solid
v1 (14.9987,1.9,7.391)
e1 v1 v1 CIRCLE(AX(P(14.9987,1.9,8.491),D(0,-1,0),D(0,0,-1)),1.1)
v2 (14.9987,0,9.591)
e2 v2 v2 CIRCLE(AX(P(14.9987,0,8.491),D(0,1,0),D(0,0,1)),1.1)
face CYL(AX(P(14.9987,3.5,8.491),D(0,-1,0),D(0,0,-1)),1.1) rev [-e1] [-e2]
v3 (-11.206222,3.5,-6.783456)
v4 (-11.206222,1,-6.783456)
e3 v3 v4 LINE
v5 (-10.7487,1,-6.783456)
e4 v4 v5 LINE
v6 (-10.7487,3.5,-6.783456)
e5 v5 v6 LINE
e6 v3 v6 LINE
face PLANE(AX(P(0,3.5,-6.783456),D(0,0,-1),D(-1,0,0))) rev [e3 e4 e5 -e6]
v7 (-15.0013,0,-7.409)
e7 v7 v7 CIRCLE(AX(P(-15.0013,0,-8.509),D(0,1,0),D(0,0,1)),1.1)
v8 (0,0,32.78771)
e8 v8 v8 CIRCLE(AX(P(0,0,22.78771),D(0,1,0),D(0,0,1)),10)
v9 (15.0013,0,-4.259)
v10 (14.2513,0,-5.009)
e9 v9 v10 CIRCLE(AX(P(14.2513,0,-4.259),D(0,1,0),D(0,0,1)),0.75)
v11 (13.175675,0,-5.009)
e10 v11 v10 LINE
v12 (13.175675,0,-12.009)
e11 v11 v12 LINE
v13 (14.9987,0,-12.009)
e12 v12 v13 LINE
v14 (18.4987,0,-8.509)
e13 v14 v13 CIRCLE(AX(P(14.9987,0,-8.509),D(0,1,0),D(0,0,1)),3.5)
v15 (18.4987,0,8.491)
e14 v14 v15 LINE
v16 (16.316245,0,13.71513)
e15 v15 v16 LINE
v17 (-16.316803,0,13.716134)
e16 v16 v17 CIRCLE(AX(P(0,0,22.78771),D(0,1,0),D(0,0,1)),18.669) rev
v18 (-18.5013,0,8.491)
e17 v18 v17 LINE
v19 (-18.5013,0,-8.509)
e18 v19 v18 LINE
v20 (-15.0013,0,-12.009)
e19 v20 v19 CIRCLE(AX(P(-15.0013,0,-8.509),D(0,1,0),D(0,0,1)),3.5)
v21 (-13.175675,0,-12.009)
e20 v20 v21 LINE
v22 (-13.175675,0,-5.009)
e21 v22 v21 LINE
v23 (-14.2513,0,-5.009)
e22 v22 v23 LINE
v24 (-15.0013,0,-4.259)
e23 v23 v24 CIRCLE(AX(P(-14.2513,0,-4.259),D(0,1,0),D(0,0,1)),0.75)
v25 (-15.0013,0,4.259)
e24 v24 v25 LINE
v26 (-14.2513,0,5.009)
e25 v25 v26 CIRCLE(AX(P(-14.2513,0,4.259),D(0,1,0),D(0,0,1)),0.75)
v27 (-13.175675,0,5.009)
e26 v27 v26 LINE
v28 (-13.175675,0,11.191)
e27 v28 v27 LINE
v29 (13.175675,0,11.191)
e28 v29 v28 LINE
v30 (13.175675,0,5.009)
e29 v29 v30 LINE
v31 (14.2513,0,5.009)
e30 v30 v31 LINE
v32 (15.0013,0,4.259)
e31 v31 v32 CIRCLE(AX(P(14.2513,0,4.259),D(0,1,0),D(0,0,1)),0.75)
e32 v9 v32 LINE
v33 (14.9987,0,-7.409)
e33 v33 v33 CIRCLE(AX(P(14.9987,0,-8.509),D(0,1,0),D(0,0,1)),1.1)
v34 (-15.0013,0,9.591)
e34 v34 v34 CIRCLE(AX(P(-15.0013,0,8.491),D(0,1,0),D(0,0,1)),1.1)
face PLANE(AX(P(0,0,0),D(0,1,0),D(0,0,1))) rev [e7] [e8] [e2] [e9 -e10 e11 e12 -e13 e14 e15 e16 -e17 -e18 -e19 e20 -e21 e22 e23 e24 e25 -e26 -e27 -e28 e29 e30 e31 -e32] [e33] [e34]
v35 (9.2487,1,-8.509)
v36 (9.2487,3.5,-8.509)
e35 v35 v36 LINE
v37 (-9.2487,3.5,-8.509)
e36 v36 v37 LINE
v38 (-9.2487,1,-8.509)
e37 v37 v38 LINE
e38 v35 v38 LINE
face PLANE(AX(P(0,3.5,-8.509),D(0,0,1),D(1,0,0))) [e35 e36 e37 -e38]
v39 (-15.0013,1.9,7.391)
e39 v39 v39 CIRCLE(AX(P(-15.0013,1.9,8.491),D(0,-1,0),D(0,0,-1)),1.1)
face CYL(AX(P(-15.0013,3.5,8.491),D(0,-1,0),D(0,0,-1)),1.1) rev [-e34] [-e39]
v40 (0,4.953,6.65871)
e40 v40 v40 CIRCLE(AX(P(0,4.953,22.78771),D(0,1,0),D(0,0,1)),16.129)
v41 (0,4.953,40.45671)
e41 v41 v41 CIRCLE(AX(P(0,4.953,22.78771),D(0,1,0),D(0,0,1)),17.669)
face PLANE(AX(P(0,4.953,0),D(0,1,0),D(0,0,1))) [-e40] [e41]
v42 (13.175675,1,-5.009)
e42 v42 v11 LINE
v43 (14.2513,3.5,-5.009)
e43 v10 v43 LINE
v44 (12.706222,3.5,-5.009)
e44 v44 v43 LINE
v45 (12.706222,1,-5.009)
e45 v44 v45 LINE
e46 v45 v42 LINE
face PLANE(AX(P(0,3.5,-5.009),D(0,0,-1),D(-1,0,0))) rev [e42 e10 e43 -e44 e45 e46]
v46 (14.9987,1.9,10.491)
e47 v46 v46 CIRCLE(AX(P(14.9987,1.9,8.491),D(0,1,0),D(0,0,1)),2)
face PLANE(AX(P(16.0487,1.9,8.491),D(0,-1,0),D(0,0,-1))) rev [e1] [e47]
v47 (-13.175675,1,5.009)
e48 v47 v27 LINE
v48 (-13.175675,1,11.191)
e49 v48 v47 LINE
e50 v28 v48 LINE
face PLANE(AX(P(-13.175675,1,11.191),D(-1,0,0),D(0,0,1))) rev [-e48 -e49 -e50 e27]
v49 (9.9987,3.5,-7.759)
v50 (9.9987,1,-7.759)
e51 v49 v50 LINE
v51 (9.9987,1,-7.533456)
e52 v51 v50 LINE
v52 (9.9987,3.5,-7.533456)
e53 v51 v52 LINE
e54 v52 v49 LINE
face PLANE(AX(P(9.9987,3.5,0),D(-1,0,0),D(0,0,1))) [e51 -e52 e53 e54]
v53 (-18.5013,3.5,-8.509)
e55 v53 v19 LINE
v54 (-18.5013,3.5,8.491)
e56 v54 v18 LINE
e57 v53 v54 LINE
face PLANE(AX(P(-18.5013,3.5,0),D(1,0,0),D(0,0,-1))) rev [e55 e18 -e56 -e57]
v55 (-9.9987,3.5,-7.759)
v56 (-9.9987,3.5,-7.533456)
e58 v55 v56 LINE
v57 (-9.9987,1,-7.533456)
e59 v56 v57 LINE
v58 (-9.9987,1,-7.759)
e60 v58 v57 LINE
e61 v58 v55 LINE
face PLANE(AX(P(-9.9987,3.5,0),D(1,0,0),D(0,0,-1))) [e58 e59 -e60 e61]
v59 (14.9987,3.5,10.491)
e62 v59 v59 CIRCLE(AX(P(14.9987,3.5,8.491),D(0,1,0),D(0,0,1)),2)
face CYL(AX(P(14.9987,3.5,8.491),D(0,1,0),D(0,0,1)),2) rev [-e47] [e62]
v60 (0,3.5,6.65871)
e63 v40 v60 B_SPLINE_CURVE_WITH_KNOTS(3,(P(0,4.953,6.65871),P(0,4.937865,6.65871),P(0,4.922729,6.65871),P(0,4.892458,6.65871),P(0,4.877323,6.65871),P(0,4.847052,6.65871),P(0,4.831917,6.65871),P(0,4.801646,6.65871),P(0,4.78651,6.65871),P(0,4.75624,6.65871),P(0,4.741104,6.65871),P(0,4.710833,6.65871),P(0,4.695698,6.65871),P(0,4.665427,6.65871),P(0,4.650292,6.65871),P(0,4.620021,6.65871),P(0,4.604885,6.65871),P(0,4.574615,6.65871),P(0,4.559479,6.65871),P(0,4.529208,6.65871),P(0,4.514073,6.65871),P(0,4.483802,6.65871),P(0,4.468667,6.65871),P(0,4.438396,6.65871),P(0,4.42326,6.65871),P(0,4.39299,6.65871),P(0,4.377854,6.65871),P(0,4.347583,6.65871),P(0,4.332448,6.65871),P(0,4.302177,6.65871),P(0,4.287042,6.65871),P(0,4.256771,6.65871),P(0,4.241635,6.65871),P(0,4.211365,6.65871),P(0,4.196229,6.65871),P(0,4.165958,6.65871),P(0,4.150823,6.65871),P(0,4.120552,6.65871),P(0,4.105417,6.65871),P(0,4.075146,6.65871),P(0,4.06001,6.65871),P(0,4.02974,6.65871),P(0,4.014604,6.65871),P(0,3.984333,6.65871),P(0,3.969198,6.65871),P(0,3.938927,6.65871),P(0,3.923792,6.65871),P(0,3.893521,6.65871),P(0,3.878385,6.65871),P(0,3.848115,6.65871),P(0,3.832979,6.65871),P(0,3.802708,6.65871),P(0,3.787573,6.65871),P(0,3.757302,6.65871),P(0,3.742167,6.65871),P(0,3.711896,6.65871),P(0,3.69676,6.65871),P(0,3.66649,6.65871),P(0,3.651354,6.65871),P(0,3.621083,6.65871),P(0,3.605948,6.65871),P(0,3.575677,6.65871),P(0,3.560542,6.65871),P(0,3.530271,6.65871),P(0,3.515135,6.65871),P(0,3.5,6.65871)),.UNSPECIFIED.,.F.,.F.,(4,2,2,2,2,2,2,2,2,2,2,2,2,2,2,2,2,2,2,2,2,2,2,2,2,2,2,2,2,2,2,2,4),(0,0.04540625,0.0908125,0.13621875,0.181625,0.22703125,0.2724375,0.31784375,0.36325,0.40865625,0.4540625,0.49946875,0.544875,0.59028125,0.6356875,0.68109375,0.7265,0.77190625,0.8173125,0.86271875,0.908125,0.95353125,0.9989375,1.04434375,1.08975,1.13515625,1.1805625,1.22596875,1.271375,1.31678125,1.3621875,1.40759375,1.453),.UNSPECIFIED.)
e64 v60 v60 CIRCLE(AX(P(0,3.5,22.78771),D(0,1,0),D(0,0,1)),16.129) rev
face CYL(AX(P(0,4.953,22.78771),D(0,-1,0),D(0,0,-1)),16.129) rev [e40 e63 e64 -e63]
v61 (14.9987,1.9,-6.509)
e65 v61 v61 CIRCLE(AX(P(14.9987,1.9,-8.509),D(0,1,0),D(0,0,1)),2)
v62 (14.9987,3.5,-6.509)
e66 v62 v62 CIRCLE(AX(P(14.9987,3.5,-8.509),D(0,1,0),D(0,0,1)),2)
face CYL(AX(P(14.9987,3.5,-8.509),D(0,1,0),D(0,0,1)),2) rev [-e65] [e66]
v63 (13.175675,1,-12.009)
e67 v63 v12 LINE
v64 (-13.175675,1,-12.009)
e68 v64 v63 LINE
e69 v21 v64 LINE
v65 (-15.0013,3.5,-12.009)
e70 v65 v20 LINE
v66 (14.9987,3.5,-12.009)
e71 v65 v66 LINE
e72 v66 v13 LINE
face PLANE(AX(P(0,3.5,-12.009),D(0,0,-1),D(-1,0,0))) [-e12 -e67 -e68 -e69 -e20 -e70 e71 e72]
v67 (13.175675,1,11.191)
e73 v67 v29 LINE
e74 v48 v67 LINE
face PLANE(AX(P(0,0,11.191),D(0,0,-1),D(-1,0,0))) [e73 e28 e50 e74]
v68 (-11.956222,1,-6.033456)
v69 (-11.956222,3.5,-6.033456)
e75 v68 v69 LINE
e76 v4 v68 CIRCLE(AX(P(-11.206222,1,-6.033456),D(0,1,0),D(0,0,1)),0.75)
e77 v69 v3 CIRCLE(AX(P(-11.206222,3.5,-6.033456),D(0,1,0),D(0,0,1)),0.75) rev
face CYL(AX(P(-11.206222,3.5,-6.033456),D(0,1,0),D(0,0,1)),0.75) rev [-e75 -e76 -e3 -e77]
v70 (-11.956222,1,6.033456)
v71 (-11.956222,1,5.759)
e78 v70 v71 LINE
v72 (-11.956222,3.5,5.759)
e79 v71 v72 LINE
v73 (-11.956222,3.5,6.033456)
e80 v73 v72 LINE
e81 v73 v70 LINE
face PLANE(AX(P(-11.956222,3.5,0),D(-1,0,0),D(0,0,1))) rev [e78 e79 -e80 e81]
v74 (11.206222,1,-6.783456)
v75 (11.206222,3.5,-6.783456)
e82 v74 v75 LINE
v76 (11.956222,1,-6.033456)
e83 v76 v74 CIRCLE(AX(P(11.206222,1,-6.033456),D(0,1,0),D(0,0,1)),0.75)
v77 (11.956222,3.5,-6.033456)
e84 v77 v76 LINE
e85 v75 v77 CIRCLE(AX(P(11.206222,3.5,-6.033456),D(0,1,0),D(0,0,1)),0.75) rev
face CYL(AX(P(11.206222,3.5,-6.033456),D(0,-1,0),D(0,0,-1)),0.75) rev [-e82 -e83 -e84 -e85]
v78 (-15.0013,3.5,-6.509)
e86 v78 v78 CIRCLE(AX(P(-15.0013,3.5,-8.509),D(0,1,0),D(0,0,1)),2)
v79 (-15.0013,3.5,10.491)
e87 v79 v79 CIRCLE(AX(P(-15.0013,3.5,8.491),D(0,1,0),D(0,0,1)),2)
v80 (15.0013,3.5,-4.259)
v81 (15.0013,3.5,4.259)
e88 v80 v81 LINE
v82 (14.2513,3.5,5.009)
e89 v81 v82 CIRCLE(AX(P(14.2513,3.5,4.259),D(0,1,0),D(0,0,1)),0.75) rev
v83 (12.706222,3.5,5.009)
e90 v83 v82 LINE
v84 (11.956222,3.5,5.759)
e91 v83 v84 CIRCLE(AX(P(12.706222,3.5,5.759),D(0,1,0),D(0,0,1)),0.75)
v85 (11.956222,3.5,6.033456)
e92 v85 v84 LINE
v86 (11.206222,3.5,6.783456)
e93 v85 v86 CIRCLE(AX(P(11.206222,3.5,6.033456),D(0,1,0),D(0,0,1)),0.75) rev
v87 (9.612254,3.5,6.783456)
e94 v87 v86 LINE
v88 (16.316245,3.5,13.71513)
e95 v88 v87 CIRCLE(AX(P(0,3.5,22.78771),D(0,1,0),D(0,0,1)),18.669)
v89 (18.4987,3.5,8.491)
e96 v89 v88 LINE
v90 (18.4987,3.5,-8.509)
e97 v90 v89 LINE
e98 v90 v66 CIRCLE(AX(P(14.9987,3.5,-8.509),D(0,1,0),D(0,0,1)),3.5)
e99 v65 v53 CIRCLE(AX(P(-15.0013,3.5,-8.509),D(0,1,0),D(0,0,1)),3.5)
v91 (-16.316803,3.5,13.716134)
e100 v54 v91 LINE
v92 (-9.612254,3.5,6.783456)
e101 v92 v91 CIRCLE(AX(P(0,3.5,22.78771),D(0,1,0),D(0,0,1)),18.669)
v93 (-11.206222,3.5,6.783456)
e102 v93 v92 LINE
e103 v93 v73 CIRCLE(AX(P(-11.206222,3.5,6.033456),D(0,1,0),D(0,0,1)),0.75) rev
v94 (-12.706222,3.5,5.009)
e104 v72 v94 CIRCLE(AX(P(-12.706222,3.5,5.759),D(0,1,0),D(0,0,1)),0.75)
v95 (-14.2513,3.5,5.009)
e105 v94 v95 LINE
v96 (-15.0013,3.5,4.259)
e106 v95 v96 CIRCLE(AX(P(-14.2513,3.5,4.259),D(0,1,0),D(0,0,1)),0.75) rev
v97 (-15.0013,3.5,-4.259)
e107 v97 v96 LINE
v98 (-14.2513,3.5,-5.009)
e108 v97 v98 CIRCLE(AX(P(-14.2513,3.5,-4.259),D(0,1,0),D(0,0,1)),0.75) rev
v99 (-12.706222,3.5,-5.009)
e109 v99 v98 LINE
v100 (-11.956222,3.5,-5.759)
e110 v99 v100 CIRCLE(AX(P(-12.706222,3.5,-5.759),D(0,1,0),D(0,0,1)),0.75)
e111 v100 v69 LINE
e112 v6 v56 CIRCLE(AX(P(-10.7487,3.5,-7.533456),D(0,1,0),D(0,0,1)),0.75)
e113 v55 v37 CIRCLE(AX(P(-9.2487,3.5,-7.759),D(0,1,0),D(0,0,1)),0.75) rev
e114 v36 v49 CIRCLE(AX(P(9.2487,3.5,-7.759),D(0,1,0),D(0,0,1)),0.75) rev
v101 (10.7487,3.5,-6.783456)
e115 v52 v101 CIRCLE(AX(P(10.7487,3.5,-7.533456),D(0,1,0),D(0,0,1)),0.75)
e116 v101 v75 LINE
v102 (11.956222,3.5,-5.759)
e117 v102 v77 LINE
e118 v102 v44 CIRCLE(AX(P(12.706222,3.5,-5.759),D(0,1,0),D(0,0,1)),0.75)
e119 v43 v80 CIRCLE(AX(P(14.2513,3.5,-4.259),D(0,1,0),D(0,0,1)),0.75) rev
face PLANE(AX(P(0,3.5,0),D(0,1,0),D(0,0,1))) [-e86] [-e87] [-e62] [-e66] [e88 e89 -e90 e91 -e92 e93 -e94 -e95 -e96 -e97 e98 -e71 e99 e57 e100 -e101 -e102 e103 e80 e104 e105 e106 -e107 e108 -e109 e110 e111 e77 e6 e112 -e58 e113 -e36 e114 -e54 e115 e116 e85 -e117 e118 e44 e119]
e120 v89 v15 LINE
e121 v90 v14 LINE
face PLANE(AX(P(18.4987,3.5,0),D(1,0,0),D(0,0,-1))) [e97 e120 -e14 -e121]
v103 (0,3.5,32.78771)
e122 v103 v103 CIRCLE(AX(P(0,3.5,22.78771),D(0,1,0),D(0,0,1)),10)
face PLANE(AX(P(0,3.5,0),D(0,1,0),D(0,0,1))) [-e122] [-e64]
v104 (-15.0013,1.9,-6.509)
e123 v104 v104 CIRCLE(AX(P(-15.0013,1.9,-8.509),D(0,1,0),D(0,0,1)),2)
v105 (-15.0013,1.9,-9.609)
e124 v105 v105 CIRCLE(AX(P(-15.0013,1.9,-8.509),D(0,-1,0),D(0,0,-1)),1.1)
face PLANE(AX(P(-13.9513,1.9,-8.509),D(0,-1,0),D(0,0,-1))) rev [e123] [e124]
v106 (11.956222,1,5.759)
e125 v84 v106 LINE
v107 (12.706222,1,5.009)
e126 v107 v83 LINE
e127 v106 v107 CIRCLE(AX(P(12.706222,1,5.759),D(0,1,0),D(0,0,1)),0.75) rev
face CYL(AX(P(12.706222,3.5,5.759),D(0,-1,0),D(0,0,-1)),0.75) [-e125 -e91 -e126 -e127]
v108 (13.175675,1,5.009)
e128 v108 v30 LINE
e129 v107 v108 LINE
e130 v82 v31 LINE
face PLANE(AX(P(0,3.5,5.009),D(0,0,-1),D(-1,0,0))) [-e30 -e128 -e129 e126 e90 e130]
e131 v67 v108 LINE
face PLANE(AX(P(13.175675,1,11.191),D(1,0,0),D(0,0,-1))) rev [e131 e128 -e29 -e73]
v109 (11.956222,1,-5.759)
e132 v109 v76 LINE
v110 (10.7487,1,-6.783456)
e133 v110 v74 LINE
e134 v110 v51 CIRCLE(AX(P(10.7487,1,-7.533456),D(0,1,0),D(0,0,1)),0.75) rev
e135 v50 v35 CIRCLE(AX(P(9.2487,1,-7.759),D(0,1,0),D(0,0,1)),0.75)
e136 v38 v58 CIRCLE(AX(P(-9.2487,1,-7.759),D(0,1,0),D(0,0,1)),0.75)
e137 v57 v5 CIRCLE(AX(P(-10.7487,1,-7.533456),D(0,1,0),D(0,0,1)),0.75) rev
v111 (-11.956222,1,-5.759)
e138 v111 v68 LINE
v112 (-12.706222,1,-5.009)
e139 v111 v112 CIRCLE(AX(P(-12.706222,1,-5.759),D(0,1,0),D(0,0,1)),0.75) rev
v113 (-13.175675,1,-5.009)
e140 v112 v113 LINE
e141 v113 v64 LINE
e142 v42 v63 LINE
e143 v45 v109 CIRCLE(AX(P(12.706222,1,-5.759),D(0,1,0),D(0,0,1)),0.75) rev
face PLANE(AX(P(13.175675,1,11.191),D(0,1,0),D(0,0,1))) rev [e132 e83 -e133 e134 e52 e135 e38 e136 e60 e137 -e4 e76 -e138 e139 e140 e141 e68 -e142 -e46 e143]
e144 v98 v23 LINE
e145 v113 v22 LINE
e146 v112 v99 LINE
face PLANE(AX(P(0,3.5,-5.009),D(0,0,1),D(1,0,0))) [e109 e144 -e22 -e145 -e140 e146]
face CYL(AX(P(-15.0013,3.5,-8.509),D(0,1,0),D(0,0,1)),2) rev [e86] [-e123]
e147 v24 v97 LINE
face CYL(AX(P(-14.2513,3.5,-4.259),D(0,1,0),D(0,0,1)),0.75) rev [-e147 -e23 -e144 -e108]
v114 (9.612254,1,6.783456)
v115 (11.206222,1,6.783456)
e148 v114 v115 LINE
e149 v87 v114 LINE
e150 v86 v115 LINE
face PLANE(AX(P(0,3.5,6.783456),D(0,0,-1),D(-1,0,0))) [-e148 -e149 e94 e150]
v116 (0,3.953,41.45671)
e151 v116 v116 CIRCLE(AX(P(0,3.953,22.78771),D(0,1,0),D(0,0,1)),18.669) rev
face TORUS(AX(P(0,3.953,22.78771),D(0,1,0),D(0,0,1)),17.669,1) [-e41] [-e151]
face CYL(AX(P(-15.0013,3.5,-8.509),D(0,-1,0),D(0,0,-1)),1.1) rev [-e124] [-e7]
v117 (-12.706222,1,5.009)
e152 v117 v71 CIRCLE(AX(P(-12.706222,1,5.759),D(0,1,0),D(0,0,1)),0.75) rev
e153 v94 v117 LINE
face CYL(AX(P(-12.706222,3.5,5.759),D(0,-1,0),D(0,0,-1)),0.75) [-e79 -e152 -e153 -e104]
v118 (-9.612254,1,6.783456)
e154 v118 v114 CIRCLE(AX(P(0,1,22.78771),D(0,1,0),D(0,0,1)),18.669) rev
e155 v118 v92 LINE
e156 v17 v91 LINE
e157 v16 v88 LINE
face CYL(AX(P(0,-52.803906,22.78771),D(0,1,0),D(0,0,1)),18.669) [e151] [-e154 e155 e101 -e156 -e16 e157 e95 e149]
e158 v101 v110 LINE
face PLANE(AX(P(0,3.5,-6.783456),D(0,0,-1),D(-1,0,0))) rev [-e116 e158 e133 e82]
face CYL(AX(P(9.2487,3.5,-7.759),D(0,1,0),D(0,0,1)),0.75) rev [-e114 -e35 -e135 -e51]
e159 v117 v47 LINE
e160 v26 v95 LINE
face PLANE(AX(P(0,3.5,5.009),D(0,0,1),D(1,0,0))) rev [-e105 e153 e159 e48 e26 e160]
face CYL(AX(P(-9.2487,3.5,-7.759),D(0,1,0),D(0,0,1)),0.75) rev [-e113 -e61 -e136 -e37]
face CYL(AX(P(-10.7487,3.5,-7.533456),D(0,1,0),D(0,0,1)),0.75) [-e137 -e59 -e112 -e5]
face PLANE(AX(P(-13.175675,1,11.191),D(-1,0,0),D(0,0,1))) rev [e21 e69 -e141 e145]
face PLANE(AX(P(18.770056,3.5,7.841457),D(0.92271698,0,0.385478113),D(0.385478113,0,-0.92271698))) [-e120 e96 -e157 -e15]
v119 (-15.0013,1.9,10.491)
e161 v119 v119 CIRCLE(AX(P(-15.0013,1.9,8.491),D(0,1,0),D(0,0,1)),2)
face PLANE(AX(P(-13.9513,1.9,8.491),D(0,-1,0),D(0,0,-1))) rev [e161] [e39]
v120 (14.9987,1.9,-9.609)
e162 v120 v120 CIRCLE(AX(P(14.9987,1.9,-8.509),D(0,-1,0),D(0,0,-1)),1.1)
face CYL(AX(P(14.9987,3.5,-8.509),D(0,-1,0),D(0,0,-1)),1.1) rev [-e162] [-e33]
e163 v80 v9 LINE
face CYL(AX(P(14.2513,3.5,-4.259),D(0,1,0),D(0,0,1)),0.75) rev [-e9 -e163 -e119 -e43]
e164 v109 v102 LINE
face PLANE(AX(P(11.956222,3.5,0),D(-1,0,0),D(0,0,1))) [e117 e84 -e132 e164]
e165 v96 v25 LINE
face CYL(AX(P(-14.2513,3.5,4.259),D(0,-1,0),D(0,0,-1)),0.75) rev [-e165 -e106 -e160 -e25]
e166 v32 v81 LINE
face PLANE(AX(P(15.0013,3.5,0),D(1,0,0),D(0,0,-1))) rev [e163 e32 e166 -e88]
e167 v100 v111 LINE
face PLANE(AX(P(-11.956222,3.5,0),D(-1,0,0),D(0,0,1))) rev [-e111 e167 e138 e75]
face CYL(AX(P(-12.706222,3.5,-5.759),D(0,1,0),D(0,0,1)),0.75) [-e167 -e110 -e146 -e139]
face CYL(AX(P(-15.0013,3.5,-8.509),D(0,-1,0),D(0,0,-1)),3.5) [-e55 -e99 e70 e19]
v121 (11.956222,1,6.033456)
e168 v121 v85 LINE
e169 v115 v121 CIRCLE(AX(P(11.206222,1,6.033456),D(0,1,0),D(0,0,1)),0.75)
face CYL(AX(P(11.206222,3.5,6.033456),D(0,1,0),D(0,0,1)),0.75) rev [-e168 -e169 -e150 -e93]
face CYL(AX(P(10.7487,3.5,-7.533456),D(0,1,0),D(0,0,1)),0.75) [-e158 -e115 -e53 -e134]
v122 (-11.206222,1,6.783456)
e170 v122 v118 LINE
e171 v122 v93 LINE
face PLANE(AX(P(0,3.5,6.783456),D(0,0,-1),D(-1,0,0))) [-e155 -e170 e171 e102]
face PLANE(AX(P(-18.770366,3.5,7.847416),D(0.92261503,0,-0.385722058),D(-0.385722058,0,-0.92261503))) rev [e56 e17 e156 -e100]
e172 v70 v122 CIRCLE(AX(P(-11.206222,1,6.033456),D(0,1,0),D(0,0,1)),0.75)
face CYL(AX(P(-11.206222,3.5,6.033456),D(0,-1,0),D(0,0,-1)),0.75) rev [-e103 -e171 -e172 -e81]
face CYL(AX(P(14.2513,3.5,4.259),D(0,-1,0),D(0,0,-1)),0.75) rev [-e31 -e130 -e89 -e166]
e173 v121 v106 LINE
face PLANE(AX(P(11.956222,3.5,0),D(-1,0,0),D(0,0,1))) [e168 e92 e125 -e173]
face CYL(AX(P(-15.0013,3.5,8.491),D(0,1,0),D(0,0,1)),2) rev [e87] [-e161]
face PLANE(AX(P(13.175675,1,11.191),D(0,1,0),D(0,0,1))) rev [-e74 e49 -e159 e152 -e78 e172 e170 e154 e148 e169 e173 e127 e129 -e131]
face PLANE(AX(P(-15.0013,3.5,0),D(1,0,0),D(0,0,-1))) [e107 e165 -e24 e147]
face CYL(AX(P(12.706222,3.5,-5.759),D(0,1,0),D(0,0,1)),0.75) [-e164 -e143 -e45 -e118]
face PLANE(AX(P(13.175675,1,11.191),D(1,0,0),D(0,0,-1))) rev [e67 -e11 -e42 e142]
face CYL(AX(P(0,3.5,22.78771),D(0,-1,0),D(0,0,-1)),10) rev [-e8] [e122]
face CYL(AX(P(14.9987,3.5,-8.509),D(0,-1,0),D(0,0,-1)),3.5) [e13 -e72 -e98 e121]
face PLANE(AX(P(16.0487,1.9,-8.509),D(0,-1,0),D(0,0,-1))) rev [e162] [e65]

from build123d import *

# Parameters (mm, degrees)
SKETCH1_R                                        = 10
SKETCH1_R_2                                      = 1.1
BOSS_EXTRUDE1_DEPTH                              = 3.5
BOSS_EXTRUDE2_START                              = -3.5
BOSS_EXTRUDE2_DEPTH                              = 3.5
SKETCH8_R                                        = 16.129
BOSS_EXTRUDE4_DEPTH                              = 1.453
SKETCH9_W                                        = 26.35135
SKETCH9_H                                        = 1
CUT_EXTRUDE1_DEPTH                               = 23.2
CBORE_FOR_M2_HEX_HEAD_MACHINE_SCREW1_D           = 2.1
CBORE_FOR_M2_HEX_HEAD_MACHINE_SCREW1_DEPTH       = 3.5
CBORE_FOR_M2_HEX_HEAD_MACHINE_SCREW1_CBORE_D     = 4
CBORE_FOR_M2_HEX_HEAD_MACHINE_SCREW1_CBORE_DEPTH = 1.6
FILLET1_R                                        = 0.75
FILLET2_R                                        = 1


# Read off the part's stored shape, not the designer's step: Boss-Extrude2
with BuildPart() as part:
    # Sketch1 → Boss-Extrude1 (new body)
    with BuildSketch(Plane(origin=(0, 0, 0), x_dir=(1, 0, 0), z_dir=(0, 1, 0))):
        with BuildLine():
            Line((-18.5013, 8.509), (-18.5013, -8.491))
            Line((-18.5013, -8.491), (-15.0013, -16.862708425))
            ThreePointArc((-15.0013, -16.862708425), (0, -38.916709632), (15.0013, -16.862708425))
            Line((15.0013, -16.862708425), (18.4987, -8.491))
            Line((18.4987, -8.491), (18.4987, 8.509))
            ThreePointArc((18.4987, 8.509), (17.473573734, 10.983873734), (14.9987, 12.009))
            Line((14.9987, 12.009), (-15.0013, 12.009))
            ThreePointArc((-15.0013, 12.009), (-17.476173734, 10.983873734), (-18.5013, 8.509))
        make_face()
        with Locations(Location((0, -22.787709632, 0), (0, 0, 270))):
            Circle(SKETCH1_R, mode=Mode.SUBTRACT)
        with Locations(Location((-15.0013, 8.509, 0), (0, 0, 270))):
            Circle(SKETCH1_R_2, mode=Mode.SUBTRACT)
        with Locations(Location((-15.0013, -8.491, 0), (0, 0, 270))):
            Circle(SKETCH1_R_2, mode=Mode.SUBTRACT)
        with Locations(Location((14.9987, 8.509, 0), (0, 0, 270))):
            Circle(SKETCH1_R_2, mode=Mode.SUBTRACT)
        with Locations(Location((14.9987, -8.491, 0), (0, 0, 270))):
            Circle(SKETCH1_R_2, mode=Mode.SUBTRACT)
        Polygon((-11.95622235, -6.783455998), (11.95622235, -6.783455998), (11.95622235, -5.009), (15.0013, -5.009), (15.0013, 5.009), (11.95622235, 5.009), (11.95622235, 6.783455998), (9.9987, 6.783455998), (9.9987, 8.509), (-9.9987, 8.509), (-9.9987, 6.783455998), (-11.95622235, 6.783455998), (-11.95622235, 5.009), (-15.0013, 5.009), (-15.0013, -5.009), (-11.95622235, -5.009), align=None, mode=Mode.SUBTRACT)
    extrude(amount=BOSS_EXTRUDE1_DEPTH)

    # Boss-Extrude2 outline → Boss-Extrude2 (add)
    with BuildSketch(Plane(origin=(0, 3.5, 0), x_dir=(1, 0, 0), z_dir=(0, 1, 0)).offset(BOSS_EXTRUDE2_START)):
        with BuildLine():
            Line((-15.0013, -16.862708425), (-16.316803416, -13.716133844))
            ThreePointArc((-16.316803416, -13.716133844), (0.000574122, -41.456709624), (16.316245434, -13.71513029))
            Line((16.316245434, -13.71513029), (15.0013, -16.862708425))
            ThreePointArc((15.0013, -16.862708425), (0, -38.916709632), (-15.0013, -16.862708425))
        make_face()
        with BuildLine():
            Line((-9.612253982, -6.783455998), (9.612253982, -6.783455998))
            ThreePointArc((9.612253982, -6.783455998), (0, -4.118709632), (-9.612253982, -6.783455998))
        make_face()
    extrude(amount=BOSS_EXTRUDE2_DEPTH)

    # Sketch8 → Boss-Extrude4 (add)
    with BuildSketch(Plane(origin=(0, 3.5, 0), x_dir=(1, 0, 0), z_dir=(0, 1, 0))):
        with BuildLine():
            ThreePointArc((-16.316803416, -13.716133844), (-4.685784781, -40.859095356), (18.669, -22.787709632))
            ThreePointArc((18.669, -22.787709632), (18.071241615, -18.10136911), (16.316245434, -13.71513029))
            ThreePointArc((16.316245434, -13.71513029), (13.419530454, -9.808966882), (9.612253982, -6.783455998))
            ThreePointArc((9.612253982, -6.783455998), (0, -4.118709632), (-9.612253982, -6.783455998))
            ThreePointArc((-9.612253982, -6.783455998), (-13.419929579, -9.809379575), (-16.316803416, -13.716133844))
        make_face()
        with Locations(Location((0, -22.787709632, 0), (0, 0, 90))):
            Circle(SKETCH8_R, mode=Mode.SUBTRACT)
    extrude(amount=BOSS_EXTRUDE4_DEPTH)

    # Sketch9 → Cut-Extrude1 (cut)
    with BuildSketch(Plane(origin=(0, 0, -12.009), x_dir=(-1, 0, 0), z_dir=(0, 0, -1))):
        with Locations((0, 0.5)):
            Rectangle(SKETCH9_W, SKETCH9_H)
    extrude(amount=-CUT_EXTRUDE1_DEPTH, mode=Mode.SUBTRACT)

    # CBORE for M2 Hex Head Machine Screw1
    with Locations(Plane(origin=(0, 3.5, 0), x_dir=(1, 0, 0), z_dir=(0, 1, 0))):
        with Locations((-15.0013, 8.509), (14.9987, 8.509), (14.9987, -8.491), (-15.0013, -8.491)):
            CounterBoreHole(CBORE_FOR_M2_HEX_HEAD_MACHINE_SCREW1_D / 2, CBORE_FOR_M2_HEX_HEAD_MACHINE_SCREW1_CBORE_D / 2, CBORE_FOR_M2_HEX_HEAD_MACHINE_SCREW1_CBORE_DEPTH, depth=CBORE_FOR_M2_HEX_HEAD_MACHINE_SCREW1_DEPTH)

    # Fillet1
    fillet1_edges = [part.edges().sort_by_distance(p)[0] for p in [
        (9.9987, 2.25, -8.509),
        (-9.9987, 2.25, -8.509),
        (-9.9987, 2.25, -6.783455998),
        (-11.95622235, 2.25, -6.783455998),
        (-11.95622235, 2.25, -5.009),
        (-15.0013, 1.75, -5.009),
        (-15.0013, 1.75, 5.009),
        (-11.95622235, 2.25, 5.009),
        (-11.95622235, 2.25, 6.783455998),
        (11.95622235, 2.25, 6.783455998),
        (11.95622235, 2.25, 5.009),
        (15.0013, 1.75, 5.009),
        (15.0013, 1.75, -5.009),
        (11.95622235, 2.25, -5.009),
        (11.95622235, 2.25, -6.783455998),
        (9.9987, 2.25, -6.783455998),
    ]]
    fillet(fillet1_edges, radius=FILLET1_R)

    # Fillet2
    fillet2_edges = [part.edges().sort_by_distance(p)[0] for p in [
        (-18.669, 4.953, 22.787709632),
    ]]
    fillet(fillet2_edges, radius=FILLET2_R)


solid = part.part
